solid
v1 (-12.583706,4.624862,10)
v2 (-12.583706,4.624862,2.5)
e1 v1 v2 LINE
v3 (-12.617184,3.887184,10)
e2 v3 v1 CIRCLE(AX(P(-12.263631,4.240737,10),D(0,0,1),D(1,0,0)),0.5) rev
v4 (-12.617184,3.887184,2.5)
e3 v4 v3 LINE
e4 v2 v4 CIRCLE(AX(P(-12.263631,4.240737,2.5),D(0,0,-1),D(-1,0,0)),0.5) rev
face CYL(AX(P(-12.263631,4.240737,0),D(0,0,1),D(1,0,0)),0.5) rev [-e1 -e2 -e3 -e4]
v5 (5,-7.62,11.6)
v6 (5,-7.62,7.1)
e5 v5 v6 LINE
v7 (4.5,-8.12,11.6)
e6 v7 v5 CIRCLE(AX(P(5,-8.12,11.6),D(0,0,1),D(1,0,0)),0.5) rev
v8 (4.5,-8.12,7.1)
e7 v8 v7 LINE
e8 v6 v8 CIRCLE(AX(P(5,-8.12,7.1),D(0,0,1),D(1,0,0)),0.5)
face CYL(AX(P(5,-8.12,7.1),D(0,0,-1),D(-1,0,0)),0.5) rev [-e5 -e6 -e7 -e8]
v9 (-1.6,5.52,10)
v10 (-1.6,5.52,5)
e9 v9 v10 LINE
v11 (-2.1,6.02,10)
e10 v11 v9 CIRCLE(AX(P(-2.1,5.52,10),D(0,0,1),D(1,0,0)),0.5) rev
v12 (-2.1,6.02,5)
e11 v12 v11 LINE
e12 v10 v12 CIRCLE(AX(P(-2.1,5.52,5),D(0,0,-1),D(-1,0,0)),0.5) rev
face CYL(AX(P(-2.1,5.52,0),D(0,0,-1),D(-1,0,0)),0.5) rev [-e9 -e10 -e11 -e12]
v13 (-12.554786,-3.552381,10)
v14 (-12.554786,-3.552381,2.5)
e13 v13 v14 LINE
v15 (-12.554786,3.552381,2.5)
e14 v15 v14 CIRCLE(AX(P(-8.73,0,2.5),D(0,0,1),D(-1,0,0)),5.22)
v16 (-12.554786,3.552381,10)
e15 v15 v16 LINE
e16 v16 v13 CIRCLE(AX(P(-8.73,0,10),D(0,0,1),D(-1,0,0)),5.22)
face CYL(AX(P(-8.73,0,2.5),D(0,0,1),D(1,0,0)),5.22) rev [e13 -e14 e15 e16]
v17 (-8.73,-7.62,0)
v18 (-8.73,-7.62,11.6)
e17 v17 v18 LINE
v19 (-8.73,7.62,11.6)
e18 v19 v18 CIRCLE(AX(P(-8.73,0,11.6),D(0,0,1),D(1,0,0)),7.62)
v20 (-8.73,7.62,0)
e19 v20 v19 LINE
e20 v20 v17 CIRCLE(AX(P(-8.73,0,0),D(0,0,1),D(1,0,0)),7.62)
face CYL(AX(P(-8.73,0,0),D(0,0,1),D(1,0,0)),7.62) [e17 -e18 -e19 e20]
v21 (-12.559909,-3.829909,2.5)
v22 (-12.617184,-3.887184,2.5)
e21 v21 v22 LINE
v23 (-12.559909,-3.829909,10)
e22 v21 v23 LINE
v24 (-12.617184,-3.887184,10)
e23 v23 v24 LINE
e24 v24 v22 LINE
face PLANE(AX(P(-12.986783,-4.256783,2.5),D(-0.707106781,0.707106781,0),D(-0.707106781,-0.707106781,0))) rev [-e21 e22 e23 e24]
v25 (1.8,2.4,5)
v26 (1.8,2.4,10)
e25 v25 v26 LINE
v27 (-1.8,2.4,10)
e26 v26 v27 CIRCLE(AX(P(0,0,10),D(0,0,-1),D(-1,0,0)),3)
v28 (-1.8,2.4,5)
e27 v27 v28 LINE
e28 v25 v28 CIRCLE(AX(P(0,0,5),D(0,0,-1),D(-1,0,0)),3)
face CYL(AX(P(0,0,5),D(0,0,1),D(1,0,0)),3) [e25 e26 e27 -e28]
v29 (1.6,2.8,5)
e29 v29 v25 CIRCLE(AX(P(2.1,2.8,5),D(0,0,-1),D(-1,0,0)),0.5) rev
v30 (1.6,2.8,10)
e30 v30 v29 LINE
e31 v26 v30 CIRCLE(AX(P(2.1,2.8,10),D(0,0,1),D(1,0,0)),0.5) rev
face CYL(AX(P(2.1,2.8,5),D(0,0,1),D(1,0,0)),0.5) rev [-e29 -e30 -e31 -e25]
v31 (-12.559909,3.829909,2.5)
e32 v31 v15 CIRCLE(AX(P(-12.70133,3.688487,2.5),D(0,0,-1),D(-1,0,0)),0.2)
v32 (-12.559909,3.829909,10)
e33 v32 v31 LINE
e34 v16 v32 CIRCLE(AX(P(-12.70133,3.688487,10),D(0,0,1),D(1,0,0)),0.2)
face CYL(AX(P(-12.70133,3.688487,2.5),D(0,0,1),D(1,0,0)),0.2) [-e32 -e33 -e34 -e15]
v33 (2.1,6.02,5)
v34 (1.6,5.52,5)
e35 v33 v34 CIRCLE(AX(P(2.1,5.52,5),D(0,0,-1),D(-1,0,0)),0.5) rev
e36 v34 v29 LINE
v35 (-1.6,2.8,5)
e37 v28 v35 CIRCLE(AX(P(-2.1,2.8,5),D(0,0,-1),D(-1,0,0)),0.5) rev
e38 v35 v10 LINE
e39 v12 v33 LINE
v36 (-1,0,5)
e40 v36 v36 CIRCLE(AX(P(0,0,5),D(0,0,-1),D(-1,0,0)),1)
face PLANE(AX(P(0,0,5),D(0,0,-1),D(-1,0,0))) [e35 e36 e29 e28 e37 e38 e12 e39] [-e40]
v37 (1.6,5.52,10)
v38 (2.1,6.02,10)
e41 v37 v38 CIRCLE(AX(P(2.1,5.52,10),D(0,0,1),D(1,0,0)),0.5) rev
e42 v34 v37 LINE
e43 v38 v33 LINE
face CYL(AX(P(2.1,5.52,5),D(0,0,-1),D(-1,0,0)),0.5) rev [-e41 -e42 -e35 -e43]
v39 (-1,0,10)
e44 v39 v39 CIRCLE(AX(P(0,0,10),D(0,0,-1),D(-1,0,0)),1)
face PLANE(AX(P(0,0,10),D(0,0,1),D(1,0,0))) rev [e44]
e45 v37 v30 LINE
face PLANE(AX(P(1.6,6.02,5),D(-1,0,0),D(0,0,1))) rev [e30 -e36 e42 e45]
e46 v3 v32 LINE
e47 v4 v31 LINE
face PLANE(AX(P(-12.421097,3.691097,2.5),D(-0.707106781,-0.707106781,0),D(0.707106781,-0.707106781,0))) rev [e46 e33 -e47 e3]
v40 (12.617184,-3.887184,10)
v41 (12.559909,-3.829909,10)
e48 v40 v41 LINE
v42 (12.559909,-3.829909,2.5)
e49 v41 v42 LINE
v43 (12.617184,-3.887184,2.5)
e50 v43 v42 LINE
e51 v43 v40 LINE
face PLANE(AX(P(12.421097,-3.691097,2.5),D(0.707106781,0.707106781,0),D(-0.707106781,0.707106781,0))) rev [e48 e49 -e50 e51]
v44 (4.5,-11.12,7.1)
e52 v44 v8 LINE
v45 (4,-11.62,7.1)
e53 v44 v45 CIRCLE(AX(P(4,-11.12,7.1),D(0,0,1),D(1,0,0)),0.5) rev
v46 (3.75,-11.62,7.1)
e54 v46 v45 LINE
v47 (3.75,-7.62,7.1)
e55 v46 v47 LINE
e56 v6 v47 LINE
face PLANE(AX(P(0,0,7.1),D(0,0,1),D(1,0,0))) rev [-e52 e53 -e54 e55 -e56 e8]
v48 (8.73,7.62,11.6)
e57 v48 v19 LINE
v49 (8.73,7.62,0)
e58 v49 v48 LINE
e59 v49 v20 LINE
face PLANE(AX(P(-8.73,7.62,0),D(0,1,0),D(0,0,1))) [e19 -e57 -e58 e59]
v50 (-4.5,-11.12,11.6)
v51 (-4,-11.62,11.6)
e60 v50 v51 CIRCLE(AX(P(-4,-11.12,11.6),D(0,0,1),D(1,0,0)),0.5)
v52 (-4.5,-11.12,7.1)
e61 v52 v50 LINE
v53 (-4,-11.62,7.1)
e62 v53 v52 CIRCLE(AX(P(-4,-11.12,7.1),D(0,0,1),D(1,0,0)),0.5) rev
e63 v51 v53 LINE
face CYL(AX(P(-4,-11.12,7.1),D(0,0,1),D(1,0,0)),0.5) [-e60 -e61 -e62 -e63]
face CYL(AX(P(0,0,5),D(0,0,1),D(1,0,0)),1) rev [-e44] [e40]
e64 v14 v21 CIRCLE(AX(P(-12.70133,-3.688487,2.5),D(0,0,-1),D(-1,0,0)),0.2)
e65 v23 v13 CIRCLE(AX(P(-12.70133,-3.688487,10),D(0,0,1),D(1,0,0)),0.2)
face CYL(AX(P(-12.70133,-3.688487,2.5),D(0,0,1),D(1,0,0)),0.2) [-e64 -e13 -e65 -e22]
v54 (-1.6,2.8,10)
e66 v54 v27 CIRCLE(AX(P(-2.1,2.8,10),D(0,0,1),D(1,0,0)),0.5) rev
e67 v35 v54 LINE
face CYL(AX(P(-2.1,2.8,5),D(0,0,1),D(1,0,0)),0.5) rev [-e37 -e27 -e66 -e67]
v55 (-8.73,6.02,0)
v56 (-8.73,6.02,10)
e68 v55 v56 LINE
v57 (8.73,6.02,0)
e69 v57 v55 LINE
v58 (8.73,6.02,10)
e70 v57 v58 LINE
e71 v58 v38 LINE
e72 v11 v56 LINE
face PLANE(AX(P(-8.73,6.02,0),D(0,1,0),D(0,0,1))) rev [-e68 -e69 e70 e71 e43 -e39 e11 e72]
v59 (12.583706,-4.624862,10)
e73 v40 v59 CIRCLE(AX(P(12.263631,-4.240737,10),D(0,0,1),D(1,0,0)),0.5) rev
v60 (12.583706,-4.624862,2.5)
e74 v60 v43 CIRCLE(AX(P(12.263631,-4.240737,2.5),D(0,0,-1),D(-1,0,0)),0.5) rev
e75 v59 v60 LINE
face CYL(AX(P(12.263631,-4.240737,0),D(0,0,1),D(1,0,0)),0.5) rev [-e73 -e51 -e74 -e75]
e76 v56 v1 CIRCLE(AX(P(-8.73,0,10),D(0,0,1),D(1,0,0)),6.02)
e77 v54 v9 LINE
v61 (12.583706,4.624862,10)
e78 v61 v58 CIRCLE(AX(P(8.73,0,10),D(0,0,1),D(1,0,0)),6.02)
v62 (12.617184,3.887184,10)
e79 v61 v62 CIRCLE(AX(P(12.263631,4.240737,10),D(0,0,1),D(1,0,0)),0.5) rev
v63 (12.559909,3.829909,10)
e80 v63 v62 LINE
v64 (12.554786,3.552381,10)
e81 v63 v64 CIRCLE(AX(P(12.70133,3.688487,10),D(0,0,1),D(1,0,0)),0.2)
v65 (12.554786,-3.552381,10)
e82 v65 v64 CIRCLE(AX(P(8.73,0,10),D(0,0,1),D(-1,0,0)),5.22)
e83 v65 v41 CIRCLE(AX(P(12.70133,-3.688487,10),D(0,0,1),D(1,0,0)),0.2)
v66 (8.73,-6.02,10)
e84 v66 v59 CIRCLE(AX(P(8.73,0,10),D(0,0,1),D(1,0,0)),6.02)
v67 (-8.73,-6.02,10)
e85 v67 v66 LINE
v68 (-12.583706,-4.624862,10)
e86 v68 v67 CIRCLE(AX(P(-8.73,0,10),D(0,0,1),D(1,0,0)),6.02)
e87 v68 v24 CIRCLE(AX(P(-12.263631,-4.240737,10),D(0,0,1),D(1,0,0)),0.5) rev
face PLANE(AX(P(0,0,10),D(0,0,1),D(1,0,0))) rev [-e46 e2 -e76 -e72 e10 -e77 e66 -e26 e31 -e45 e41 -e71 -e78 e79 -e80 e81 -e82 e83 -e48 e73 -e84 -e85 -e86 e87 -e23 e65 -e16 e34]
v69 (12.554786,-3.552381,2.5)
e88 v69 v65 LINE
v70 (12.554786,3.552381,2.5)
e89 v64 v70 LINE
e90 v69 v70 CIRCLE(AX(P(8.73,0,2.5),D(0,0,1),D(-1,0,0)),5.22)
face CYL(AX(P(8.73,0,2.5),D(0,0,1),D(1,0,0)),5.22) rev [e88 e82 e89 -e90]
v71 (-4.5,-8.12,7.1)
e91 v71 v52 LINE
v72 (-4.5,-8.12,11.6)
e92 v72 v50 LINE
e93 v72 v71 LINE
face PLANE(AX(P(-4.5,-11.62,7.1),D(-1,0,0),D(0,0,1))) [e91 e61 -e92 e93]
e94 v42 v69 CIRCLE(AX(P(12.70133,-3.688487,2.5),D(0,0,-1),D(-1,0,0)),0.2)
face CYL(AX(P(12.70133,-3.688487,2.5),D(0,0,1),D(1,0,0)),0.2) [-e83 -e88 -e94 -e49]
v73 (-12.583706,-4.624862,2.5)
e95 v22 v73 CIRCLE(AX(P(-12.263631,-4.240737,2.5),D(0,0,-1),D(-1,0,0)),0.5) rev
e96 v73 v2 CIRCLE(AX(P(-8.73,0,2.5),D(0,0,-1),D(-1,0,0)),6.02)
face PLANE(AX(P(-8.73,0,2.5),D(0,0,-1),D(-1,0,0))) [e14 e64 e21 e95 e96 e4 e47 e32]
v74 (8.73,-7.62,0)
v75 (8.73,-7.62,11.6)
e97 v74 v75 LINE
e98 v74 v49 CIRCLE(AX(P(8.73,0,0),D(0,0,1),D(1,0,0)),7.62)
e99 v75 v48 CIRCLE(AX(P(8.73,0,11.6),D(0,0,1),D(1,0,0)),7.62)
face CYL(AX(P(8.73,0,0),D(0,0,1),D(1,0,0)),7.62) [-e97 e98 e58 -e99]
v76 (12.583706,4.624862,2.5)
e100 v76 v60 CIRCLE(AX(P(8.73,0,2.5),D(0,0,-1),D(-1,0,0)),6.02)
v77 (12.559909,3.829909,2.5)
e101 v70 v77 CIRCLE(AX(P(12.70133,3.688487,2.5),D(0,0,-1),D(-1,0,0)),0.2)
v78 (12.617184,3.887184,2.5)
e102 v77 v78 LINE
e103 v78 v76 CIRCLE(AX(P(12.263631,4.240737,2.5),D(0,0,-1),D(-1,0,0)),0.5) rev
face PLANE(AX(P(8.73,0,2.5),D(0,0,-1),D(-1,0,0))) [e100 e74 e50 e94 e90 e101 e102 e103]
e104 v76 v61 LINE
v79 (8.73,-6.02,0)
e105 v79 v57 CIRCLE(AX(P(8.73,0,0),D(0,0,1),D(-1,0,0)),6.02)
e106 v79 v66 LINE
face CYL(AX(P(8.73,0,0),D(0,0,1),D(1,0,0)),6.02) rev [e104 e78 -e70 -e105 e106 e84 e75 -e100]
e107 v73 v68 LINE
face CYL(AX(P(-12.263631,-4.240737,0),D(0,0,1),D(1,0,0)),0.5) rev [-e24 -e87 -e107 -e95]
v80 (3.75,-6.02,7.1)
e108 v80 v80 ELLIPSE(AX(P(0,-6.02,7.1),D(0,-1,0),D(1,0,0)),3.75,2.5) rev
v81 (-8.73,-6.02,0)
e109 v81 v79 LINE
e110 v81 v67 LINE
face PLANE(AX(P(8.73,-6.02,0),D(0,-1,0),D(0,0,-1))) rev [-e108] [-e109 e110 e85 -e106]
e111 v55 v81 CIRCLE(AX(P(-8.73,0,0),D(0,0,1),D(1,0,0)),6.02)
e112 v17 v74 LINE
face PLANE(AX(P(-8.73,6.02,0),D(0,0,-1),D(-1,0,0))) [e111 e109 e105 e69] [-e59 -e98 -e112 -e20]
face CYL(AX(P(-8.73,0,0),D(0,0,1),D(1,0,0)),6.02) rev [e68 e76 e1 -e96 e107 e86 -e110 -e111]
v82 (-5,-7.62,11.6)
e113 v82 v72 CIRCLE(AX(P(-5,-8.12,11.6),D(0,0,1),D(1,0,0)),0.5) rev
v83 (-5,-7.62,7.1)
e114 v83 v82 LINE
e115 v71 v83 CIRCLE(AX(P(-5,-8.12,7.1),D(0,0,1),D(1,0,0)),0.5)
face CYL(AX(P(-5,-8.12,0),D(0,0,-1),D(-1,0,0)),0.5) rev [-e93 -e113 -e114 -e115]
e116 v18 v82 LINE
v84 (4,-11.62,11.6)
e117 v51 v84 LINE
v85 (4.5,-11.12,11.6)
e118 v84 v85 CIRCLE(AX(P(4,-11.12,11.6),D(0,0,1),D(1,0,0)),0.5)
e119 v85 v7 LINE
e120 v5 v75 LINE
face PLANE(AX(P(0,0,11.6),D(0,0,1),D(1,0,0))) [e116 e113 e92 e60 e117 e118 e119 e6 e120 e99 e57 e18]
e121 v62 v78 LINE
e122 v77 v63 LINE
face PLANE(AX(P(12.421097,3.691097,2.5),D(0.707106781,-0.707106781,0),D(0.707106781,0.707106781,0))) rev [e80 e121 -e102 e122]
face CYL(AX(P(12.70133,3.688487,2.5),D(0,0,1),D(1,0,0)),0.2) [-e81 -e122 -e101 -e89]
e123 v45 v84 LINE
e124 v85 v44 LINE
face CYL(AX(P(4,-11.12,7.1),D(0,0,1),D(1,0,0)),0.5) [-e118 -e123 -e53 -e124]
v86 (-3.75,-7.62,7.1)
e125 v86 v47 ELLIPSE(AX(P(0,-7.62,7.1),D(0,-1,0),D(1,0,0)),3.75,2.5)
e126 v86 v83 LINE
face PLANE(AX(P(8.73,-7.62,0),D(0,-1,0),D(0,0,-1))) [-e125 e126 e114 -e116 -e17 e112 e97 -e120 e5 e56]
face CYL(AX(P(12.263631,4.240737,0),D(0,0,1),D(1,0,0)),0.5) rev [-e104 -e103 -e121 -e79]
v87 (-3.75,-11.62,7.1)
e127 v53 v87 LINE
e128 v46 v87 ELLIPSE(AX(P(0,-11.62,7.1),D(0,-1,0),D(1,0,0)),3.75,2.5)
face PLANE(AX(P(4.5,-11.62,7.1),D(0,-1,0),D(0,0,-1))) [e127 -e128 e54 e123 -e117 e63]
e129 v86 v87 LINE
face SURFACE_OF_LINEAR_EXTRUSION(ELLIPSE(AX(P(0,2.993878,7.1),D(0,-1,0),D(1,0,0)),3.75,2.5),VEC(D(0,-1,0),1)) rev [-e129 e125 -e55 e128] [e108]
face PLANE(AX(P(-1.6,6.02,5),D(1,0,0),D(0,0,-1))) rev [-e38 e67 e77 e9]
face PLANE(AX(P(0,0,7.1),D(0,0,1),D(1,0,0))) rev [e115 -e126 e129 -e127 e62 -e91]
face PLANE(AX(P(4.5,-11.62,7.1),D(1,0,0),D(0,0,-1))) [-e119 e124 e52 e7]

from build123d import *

# Parameters (mm, degrees)
THICKEN1_DEPTH      = 11.6
THICKEN1_START      = 10
THICKEN1_2_DEPTH    = 1.6
SKETCH2_R           = 1
BOSS_EXTRUDE1_DEPTH = 5
SKETCH3_W           = 9
SKETCH3_H           = 4
BOSS_EXTRUDE2_DEPTH = 4.5
CUT_EXTRUDE1_REACH  = 29.786
SKETCH4_RX          = 3.75
SKETCH4_RY          = 2.5
BOSS_EXTRUDE3_START = 7.5
BOSS_EXTRUDE3_DEPTH = 7.5
FILLET1_R           = 0.5
FILLET2_R           = 0.2


# Read off the part's stored shape, not the designer's step: Thicken1
with BuildPart() as part:
    # Thicken1 outline → Thicken1 (new body)
    with BuildSketch(Plane.XY):
        with BuildLine():
            Line((-8.73, -7.62), (8.73, -7.62))
            ThreePointArc((8.73, -7.62), (16.35, 0), (8.73, 7.62))
            Line((8.73, 7.62), (-8.73, 7.62))
            ThreePointArc((-8.73, 7.62), (-16.35, 0), (-8.73, -7.62))
        make_face()
        with BuildLine():
            ThreePointArc((8.73, 6.02), (14.75, 0), (8.73, -6.02))
            Line((8.73, -6.02), (-8.73, -6.02))
            ThreePointArc((-8.73, -6.02), (-14.75, 0), (-8.73, 6.02))
            Line((-8.73, 6.02), (8.73, 6.02))
        make_face(mode=Mode.SUBTRACT)
    extrude(amount=THICKEN1_DEPTH)

    # Thicken1 2 outline → Thicken1 2 (add)
    with BuildSketch(Plane.XY.offset(THICKEN1_START)):
        with BuildLine():
            Line((-8.73, -6.02), (8.73, -6.02))
            ThreePointArc((8.73, -6.02), (14.75, 0), (8.73, 6.02))
            Line((8.73, 6.02), (-8.73, 6.02))
            ThreePointArc((-8.73, 6.02), (-14.75, 0), (-8.73, -6.02))
        make_face()
    extrude(amount=THICKEN1_2_DEPTH)

    # Sketch2 → Boss-Extrude1 (add)
    with BuildSketch(Plane(origin=(0, 0, 10), x_dir=(-1, 0, 0), z_dir=(0, 0, -1))):
        with BuildLine():
            Line((1.6, 6.02), (-1.6, 6.02))
            Line((-1.6, 6.02), (-1.6, 2.537715508))
            ThreePointArc((-1.6, 2.537715508), (-2.537715508, -1.6), (1.6, -2.537715508))
            ThreePointArc((1.6, -2.537715508), (3, 0), (1.6, 2.537715508))
            Line((1.6, 2.537715508), (1.6, 6.02))
        make_face()
        Circle(SKETCH2_R, mode=Mode.SUBTRACT)
    extrude(amount=BOSS_EXTRUDE1_DEPTH)

    # Sketch3 → Boss-Extrude2 (add)
    with BuildSketch(Plane.XY.offset(11.6)):
        with Locations((0, -9.62)):
            Rectangle(SKETCH3_W, SKETCH3_H)
    extrude(amount=-BOSS_EXTRUDE2_DEPTH)

    # Cut-Extrude1: up to this face of the body (flat: up to its plane)
    cut_extrude1_end = Plane(part.part.faces().sort_by_distance((0, -6.02, 5))[0])
    # Sketch4 → Cut-Extrude1 (cut, up to the picked face)
    with BuildSketch(Plane.XZ.offset(11.62), mode=Mode.PRIVATE) as cut_extrude1_sk1:
        with Locations(Location((0, 7.1), (0, 0, 0))):
            Ellipse(SKETCH4_RX, SKETCH4_RY)
    cut_extrude1_tool1 = split(extrude(cut_extrude1_sk1.sketch, amount=-CUT_EXTRUDE1_REACH, mode=Mode.PRIVATE), bisect_by=cut_extrude1_end, keep=Keep.BOTH, mode=Mode.PRIVATE)
    add(cut_extrude1_tool1.solids().sort_by(Axis((0, -11.62, 7.1), (0, 1, 0)))[0], mode=Mode.SUBTRACT)

    # Sketch6 → Boss-Extrude3 (add)
    with BuildSketch(Plane(origin=(0, 0, 10), x_dir=(-1, 0, 0), z_dir=(0, 0, -1)).offset(BOSS_EXTRUDE3_START)):
        with BuildLine():
            Line((-12.421097398, -3.691097398), (-12.986782823, -4.256782823))
            ThreePointArc((-12.986782823, -4.256782823), (-14.75, 0), (-12.986782823, 4.256782823))
            Line((-12.986782823, 4.256782823), (-12.421097398, 3.691097398))
            ThreePointArc((-12.421097398, 3.691097398), (-13.95, 0), (-12.421097398, -3.691097398))
        make_face()
        with BuildLine():
            Line((12.986782823, -4.256782823), (12.421097398, -3.691097398))
            ThreePointArc((12.421097398, -3.691097398), (13.95, 0), (12.421097398, 3.691097398))
            Line((12.421097398, 3.691097398), (12.986782823, 4.256782823))
            ThreePointArc((12.986782823, 4.256782823), (14.75, 0), (12.986782823, -4.256782823))
        make_face()
    extrude(amount=-BOSS_EXTRUDE3_DEPTH)

    # Fillet1
    fillet1_edges = [part.edges().sort_by_distance(p)[0] for p in [
        (-4.5, -7.62, 9.35),
        (-4.5, -11.62, 9.35),
        (4.5, -7.62, 9.35),
        (4.5, -11.62, 9.35),
        (1.6, 2.537715508, 7.5),
        (1.6, 6.02, 7.5),
        (-1.6, 6.02, 7.5),
        (-1.6, 2.537715508, 7.5),
        (-12.986782823, -4.256782823, 6.25),
        (-12.986782823, 4.256782823, 6.25),
        (12.986782823, 4.256782823, 6.25),
        (12.986782823, -4.256782823, 6.25),
    ]]
    fillet(fillet1_edges, radius=FILLET1_R)

    # Fillet2
    fillet2_edges = [part.edges().sort_by_distance(p)[0] for p in [
        (12.421097398, -3.691097398, 6.25),
        (12.421097398, 3.691097398, 6.25),
        (-12.421097398, 3.691097398, 6.25),
        (-12.421097398, -3.691097398, 6.25),
    ]]
    fillet(fillet2_edges, radius=FILLET2_R)


solid = part.part
